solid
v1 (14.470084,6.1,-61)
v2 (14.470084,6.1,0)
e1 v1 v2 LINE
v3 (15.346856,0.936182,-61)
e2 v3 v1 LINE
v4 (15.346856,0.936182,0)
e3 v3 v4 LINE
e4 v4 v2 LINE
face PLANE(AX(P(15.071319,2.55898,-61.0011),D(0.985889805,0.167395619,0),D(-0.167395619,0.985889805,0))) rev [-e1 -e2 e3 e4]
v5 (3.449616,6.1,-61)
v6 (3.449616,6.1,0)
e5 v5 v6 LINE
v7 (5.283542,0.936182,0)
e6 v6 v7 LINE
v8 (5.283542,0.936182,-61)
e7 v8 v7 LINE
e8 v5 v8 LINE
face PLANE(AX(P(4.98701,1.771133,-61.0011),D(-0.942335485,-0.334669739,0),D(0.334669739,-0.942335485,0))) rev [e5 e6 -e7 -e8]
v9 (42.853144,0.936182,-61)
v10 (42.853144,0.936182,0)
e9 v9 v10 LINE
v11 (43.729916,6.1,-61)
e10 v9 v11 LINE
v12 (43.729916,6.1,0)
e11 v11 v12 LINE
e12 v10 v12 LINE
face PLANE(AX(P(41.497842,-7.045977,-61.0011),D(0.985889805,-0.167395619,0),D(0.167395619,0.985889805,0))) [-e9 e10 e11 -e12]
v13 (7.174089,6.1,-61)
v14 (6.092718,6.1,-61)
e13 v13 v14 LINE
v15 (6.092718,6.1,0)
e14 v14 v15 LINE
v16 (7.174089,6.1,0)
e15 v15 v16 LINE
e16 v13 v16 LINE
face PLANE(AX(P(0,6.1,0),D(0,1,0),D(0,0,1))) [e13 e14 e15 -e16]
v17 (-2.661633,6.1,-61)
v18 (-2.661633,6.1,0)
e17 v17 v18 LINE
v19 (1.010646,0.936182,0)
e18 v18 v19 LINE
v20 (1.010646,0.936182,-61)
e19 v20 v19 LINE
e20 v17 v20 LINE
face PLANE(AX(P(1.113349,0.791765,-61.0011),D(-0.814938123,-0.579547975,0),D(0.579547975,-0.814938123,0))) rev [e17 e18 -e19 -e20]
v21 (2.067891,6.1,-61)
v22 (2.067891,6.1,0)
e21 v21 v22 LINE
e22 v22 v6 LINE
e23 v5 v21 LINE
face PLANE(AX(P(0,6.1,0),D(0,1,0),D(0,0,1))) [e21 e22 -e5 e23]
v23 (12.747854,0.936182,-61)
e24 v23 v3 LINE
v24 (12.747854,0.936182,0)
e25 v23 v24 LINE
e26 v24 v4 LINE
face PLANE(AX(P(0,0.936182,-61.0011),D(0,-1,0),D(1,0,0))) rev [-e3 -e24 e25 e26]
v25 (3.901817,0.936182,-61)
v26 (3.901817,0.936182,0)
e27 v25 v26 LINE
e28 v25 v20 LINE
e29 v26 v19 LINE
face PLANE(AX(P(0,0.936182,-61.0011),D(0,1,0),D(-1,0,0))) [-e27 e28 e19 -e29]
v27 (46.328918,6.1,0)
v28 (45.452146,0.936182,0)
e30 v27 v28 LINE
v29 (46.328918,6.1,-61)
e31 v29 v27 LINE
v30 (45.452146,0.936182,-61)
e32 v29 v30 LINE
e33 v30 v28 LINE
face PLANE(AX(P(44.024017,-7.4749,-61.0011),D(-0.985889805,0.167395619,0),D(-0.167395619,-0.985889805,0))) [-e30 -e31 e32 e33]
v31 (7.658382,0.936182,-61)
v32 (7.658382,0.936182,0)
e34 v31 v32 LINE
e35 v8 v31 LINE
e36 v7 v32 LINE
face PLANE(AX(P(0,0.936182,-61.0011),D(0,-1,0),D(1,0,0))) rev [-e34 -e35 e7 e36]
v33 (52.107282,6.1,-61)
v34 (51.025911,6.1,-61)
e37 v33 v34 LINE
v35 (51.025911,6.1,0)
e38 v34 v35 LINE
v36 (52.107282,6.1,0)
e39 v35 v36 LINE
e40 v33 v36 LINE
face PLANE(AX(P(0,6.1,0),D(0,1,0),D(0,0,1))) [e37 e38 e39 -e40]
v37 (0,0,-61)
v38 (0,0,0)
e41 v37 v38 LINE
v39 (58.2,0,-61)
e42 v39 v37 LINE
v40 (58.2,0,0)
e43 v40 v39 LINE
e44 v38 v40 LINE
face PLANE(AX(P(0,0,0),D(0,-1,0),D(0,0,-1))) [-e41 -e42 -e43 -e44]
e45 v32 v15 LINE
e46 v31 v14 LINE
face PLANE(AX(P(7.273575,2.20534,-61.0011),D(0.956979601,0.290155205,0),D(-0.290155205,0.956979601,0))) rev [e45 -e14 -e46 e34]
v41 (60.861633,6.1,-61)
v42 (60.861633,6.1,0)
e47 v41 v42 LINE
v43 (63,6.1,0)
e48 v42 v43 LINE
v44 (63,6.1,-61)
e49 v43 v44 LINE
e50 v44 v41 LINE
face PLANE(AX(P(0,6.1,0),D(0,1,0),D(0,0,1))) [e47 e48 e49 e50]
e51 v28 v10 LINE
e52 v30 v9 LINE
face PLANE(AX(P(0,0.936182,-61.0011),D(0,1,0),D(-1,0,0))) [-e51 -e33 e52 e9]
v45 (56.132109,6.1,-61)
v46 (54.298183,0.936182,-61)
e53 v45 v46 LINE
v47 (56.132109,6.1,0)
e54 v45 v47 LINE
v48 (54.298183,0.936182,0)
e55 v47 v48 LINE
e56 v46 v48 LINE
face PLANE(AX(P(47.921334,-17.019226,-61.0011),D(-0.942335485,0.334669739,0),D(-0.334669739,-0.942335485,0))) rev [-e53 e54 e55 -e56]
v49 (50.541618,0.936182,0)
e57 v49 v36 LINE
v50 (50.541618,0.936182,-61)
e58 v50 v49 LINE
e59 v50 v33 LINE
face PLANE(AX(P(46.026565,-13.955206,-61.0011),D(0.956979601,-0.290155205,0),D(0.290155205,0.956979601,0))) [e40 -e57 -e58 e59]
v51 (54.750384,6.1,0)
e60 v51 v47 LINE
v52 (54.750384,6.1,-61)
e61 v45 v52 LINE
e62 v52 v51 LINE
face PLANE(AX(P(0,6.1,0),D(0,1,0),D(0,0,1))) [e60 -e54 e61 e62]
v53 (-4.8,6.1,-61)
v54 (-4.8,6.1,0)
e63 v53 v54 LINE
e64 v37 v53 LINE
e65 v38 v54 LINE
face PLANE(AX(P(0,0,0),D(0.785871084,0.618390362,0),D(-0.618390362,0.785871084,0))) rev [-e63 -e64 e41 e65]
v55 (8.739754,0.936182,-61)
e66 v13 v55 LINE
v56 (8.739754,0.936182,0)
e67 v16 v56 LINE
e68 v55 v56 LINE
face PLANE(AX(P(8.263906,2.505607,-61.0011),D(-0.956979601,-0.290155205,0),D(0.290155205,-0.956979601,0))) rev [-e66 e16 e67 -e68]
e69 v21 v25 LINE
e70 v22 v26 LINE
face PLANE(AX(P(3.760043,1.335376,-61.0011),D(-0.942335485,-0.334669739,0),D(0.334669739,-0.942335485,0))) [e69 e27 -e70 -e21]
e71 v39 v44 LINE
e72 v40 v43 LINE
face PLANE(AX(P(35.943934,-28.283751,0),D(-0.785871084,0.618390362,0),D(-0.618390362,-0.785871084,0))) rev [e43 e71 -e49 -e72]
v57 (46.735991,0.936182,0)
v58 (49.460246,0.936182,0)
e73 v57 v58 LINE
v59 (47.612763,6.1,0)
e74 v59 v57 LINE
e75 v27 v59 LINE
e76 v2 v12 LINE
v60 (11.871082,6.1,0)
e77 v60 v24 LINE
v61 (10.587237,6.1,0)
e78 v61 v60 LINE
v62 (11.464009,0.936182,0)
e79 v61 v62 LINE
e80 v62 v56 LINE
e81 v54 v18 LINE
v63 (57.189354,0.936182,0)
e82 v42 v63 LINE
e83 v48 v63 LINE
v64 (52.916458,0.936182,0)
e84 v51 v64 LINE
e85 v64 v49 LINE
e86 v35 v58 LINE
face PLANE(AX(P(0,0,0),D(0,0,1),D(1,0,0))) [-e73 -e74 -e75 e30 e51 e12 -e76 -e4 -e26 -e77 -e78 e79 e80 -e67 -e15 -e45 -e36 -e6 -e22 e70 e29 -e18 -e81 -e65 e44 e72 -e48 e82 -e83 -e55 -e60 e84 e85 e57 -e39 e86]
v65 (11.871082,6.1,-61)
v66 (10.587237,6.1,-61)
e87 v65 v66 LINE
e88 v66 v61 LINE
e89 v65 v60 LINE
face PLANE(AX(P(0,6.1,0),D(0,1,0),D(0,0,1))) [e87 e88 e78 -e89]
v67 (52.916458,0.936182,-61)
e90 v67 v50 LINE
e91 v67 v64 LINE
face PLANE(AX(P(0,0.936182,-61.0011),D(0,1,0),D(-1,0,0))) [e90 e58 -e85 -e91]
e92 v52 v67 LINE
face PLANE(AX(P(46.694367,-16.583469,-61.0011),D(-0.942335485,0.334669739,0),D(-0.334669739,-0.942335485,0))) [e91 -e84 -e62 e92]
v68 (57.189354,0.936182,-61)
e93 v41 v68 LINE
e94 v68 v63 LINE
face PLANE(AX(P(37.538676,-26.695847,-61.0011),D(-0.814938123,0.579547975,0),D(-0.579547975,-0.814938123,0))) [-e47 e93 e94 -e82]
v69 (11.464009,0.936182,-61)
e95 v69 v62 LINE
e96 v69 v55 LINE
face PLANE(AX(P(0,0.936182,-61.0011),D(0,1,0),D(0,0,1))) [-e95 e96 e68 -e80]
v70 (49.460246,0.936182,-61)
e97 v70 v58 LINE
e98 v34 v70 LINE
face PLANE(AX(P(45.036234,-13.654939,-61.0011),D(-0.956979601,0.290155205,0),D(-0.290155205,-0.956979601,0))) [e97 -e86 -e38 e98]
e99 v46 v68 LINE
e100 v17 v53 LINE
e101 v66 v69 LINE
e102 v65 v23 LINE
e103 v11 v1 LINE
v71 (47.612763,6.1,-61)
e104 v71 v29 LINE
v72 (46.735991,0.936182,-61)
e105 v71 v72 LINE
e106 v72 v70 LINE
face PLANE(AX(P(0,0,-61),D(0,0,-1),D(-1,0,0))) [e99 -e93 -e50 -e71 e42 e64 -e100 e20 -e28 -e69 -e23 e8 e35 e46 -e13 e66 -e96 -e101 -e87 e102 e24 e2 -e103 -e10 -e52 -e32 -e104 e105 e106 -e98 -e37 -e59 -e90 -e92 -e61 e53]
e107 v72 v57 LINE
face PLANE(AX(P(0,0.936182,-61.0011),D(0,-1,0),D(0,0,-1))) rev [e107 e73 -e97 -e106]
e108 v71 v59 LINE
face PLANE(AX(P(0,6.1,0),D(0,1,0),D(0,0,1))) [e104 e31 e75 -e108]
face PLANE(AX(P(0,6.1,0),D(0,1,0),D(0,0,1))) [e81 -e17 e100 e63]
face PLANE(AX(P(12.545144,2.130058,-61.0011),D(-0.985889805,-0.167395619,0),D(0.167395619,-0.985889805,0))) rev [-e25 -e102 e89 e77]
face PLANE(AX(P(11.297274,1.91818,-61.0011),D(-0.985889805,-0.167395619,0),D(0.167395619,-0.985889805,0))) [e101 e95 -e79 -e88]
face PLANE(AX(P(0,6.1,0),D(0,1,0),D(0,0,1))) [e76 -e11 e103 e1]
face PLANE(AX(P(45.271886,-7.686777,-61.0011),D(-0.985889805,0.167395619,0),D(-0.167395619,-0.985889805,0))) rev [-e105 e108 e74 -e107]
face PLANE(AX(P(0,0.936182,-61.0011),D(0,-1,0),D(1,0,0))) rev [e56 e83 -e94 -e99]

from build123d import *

# Parameters (mm, degrees)
CUT_EXTRUDE1_START = -61
CUT_EXTRUDE1_DEPTH = 61


# Read off the part's stored shape, not the designer's step: Cut-Extrude1
with BuildPart() as part:
    # Sketch1 → Loft1 section 0
    with BuildSketch(Plane(origin=(0, 0, 0), x_dir=(1, 0, 0), z_dir=(0, 1, 0))):
        with BuildLine():
            Line((0, 0), (58.2, 0))
            Line((58.2, 0), (58.2, 61))
            Line((58.2, 61), (0, 61))
            Line((0, 61), (0, 0))
        make_face()
    # Sketch2 → Loft1 section 1
    with BuildSketch(Plane(origin=(0, 6.099999992, 0), x_dir=(1, 0, 0), z_dir=(0, 1, 0))):
        with BuildLine():
            Line((-4.8, 61), (63, 61))
            Line((63, 61), (63, 0))
            Line((63, 0), (-4.8, 0))
            Line((-4.8, 0), (-4.8, 61))
        make_face()
    loft()

    # Cut-Extrude1 outline → Cut-Extrude1 (cut)
    with BuildSketch(Plane.XY.offset(CUT_EXTRUDE1_START)):
        Polygon((60.861632844, 6.099999992), (56.132109475, 6.099999992), (54.298183465, 0.936182189), (57.189353849, 0.936182189), align=None)
        Polygon((54.750384399, 6.099999992), (52.107282262, 6.099999992), (50.541618156, 0.936182189), (52.916458389, 0.936182189), align=None)
        Polygon((51.025910518, 6.099999992), (47.612762768, 6.099999992), (46.735990868, 0.936182189), (49.460246412, 0.936182189), align=None)
        Polygon((46.328918201, 6.099999992), (43.729915785, 6.099999992), (42.853143886, 0.936182189), (45.452146301, 0.936182189), align=None)
        Polygon((14.470084215, 6.099999992), (11.871081799, 6.099999992), (12.747853699, 0.936182189), (15.346856114, 0.936182189), align=None)
        Polygon((10.587237232, 6.099999992), (7.174089482, 6.099999992), (8.739753588, 0.936182189), (11.464009132, 0.936182189), align=None)
        Polygon((6.092717738, 6.099999992), (3.449615601, 6.099999992), (5.283541611, 0.936182189), (7.658381844, 0.936182189), align=None)
        Polygon((1.010646151, 0.936182189), (3.901816535, 0.936182189), (2.067890525, 6.099999992), (-2.661632844, 6.099999992), align=None)
    extrude(amount=CUT_EXTRUDE1_DEPTH, mode=Mode.SUBTRACT)


solid = part.part
